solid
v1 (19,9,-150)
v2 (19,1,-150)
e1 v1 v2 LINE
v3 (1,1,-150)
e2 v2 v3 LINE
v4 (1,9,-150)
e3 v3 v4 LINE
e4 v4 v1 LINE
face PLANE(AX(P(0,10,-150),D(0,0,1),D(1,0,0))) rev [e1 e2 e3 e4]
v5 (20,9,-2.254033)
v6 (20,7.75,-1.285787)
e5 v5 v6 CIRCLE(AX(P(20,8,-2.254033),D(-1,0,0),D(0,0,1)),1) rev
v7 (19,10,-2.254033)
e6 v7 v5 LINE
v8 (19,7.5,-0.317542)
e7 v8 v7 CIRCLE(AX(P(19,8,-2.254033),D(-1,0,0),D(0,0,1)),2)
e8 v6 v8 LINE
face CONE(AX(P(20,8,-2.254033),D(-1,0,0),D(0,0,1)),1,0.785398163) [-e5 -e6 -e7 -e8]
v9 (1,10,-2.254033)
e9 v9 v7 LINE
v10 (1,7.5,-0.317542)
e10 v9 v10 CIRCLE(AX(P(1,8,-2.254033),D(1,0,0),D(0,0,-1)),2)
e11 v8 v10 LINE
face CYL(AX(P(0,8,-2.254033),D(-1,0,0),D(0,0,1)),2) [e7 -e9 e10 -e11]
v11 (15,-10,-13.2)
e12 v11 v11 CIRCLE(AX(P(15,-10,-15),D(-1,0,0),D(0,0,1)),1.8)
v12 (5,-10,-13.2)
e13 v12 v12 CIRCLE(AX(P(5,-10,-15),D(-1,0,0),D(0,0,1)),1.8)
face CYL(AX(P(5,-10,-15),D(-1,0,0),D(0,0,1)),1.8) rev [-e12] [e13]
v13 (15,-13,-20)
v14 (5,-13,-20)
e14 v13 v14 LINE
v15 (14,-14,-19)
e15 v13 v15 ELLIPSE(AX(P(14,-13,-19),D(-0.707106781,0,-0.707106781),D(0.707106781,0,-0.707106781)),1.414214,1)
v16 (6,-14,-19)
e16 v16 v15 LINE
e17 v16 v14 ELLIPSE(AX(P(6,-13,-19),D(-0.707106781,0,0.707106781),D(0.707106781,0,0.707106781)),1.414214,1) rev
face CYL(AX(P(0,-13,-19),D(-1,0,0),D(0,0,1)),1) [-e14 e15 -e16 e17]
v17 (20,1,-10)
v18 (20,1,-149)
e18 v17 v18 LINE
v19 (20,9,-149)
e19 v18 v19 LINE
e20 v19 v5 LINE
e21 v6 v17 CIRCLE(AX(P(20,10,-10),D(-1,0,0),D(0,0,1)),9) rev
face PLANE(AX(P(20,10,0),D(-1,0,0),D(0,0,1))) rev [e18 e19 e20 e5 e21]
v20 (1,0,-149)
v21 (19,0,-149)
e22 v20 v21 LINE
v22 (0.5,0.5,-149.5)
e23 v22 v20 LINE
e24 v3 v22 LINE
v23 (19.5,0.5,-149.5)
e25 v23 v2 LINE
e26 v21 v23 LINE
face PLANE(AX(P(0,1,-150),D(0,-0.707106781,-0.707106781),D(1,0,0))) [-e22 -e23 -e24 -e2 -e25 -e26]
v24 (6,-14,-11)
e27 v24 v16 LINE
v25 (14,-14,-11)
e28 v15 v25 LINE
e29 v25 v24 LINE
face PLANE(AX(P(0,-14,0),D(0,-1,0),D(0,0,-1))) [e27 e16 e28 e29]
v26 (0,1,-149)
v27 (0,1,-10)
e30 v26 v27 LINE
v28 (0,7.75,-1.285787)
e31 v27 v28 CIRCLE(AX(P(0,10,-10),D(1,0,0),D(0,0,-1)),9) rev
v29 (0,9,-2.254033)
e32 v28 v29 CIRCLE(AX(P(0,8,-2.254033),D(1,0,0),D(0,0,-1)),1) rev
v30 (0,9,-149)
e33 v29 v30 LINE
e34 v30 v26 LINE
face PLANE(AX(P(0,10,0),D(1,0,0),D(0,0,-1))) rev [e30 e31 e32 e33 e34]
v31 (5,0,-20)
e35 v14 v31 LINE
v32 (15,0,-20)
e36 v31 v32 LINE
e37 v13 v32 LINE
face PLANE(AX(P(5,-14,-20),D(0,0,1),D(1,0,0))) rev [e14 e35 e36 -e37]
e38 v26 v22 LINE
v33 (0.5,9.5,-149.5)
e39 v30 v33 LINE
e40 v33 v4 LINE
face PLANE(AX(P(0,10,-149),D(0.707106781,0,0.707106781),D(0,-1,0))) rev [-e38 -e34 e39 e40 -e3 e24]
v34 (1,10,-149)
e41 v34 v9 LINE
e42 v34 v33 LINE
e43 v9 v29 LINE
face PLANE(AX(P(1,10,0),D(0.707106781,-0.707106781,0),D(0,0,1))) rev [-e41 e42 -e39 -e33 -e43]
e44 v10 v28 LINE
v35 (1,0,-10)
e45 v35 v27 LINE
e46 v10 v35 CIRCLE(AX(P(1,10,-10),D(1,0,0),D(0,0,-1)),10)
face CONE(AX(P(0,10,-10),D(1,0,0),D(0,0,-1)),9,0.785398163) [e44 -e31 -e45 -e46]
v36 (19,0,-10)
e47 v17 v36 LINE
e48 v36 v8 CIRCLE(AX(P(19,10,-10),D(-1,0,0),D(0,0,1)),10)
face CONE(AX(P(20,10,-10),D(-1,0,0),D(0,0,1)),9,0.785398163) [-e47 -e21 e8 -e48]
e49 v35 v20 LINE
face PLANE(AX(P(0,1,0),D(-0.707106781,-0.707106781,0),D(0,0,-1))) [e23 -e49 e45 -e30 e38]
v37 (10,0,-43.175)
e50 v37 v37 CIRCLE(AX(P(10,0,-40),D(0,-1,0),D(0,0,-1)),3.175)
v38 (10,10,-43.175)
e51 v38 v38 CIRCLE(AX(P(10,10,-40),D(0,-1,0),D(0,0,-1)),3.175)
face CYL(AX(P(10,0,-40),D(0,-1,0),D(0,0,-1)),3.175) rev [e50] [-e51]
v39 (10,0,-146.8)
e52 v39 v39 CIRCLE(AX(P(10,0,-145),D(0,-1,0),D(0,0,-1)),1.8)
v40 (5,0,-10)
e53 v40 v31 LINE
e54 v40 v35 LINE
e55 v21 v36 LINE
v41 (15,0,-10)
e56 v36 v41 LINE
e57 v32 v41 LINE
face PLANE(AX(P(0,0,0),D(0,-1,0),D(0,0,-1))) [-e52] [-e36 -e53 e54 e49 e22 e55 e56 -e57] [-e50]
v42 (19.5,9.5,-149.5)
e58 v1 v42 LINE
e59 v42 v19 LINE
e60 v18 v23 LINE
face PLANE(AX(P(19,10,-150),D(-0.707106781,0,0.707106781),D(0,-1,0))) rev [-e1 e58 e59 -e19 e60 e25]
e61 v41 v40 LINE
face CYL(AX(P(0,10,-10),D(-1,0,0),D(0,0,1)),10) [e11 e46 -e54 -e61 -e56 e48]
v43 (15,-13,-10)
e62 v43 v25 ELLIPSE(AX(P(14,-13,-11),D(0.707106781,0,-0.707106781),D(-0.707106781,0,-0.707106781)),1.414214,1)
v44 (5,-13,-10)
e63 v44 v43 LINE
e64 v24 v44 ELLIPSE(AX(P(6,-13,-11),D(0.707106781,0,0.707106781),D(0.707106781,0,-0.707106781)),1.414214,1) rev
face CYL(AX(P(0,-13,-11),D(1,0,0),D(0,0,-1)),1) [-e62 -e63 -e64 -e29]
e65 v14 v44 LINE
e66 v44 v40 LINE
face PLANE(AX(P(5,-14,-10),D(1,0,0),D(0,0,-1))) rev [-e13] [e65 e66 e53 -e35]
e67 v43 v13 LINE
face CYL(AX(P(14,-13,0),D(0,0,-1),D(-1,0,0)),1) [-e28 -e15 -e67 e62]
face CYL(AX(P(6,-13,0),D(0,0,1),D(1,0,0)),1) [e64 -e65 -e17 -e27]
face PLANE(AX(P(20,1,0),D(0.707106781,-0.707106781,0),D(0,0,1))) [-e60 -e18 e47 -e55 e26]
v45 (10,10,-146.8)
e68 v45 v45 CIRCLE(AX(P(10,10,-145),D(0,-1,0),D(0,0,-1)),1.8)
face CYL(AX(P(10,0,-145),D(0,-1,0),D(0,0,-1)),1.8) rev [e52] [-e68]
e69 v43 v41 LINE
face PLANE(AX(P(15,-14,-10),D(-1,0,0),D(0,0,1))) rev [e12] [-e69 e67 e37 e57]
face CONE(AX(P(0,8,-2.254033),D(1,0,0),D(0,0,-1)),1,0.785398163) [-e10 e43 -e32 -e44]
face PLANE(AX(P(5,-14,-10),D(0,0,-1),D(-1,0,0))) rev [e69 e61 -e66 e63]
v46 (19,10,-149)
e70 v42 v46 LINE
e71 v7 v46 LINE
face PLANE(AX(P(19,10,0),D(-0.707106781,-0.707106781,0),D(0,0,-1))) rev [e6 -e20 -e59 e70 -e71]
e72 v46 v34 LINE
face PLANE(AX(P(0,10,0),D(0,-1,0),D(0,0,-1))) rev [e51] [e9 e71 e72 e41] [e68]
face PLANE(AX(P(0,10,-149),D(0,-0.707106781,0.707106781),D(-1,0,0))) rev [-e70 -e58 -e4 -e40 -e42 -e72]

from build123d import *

# Parameters (mm, degrees)
SKETCH1_W                   = 20
SKETCH1_H                   = 150
BOSS_EXTRUDE1_DEPTH         = 10
M3_CLEARANCE_HOLE1_D        = 3.6
SKETCH3_W                   = 10
SKETCH3_H                   = 10
BOSS_EXTRUDE2_DEPTH         = 14
M3_CLEARANCE_HOLE5_D        = 3.6
F_1_4_0_25_DIAMETER_HOLE1_D = 6.35
FILLET1_R                   = 10
FILLET2_R                   = 2
CHAMFER1_SIZE               = 1
FILLET3_R                   = 1
CHAMFER2_SIZE               = 1


with BuildPart() as part:
    # Sketch1 → Boss-Extrude1 (new body)
    with BuildSketch(Plane(origin=(0, 0, 0), x_dir=(1, 0, 0), z_dir=(0, 1, 0))):
        with Locations((10, 75)):
            Rectangle(SKETCH1_W, SKETCH1_H)
    extrude(amount=BOSS_EXTRUDE1_DEPTH)

    # M3 Clearance Hole1 (through all)
    with Locations(Plane(origin=(10, 0, -145), x_dir=(0, 0, -1), z_dir=(0, -1, 0))):
        with Locations((0, 0)):
            Hole(M3_CLEARANCE_HOLE1_D / 2)

    # Sketch3 → Boss-Extrude2 (add)
    with BuildSketch(Plane.XZ):
        with Locations((10, -15)):
            Rectangle(SKETCH3_W, SKETCH3_H)
    extrude(amount=BOSS_EXTRUDE2_DEPTH)

    # M3 Clearance Hole5 (through all)
    with Locations(Plane(origin=(5, -10, -15), x_dir=(0, 0, -1), z_dir=(-1, 0, 0))):
        with Locations((0, 0)):
            Hole(M3_CLEARANCE_HOLE5_D / 2)

    # 1/4 (0.25) Diameter Hole1 (through all)
    with Locations(Plane(origin=(10, 0, -40), x_dir=(0, 0, -1), z_dir=(0, -1, 0))):
        with Locations((0, 0)):
            Hole(F_1_4_0_25_DIAMETER_HOLE1_D / 2)

    # Fillet1
    fillet1_edges = [part.edges().sort_by_distance(p)[0] for p in [
        (10, 0, 0),
    ]]
    fillet(fillet1_edges, radius=FILLET1_R - 0.0001)  # a hair under: the kernel refuses the full size

    # Fillet2
    fillet2_edges = [part.edges().sort_by_distance(p)[0] for p in [
        (10, 10, 0),
    ]]
    fillet(fillet2_edges, radius=FILLET2_R)

    # Chamfer1
    chamfer1_edges = [part.edges().sort_by_distance(p)[0] for p in [
        (20, 0, -79.99995),
        (0, 2.094314553, -3.876198607),
        (20, 10, -76.127005384),
        (0, 10, -76.127005384),
        (20, 2.094314553, -3.876198607),
        (20, 9.224752526, -0.672877867),
        (0, 9.224752526, -0.672877867),
        (0, 0, -79.99995),
        (0, 5, -150),
        (20, 5, -150),
    ]]
    chamfer(chamfer1_edges, length=CHAMFER1_SIZE)

    # Fillet3
    fillet3_edges = [part.edges().sort_by_distance(p)[0] for p in [
        (5, -14, -15),
        (10, -14, -20),
        (15, -14, -15),
        (10, -14, -10),
    ]]
    fillet(fillet3_edges, radius=FILLET3_R)

    # Chamfer2
    chamfer2_edges = [part.edges().sort_by_distance(p)[0] for p in [
        (10, 0, -150),
        (10, 10, -150),
    ]]
    chamfer(chamfer2_edges, length=CHAMFER2_SIZE)


solid = part.part
